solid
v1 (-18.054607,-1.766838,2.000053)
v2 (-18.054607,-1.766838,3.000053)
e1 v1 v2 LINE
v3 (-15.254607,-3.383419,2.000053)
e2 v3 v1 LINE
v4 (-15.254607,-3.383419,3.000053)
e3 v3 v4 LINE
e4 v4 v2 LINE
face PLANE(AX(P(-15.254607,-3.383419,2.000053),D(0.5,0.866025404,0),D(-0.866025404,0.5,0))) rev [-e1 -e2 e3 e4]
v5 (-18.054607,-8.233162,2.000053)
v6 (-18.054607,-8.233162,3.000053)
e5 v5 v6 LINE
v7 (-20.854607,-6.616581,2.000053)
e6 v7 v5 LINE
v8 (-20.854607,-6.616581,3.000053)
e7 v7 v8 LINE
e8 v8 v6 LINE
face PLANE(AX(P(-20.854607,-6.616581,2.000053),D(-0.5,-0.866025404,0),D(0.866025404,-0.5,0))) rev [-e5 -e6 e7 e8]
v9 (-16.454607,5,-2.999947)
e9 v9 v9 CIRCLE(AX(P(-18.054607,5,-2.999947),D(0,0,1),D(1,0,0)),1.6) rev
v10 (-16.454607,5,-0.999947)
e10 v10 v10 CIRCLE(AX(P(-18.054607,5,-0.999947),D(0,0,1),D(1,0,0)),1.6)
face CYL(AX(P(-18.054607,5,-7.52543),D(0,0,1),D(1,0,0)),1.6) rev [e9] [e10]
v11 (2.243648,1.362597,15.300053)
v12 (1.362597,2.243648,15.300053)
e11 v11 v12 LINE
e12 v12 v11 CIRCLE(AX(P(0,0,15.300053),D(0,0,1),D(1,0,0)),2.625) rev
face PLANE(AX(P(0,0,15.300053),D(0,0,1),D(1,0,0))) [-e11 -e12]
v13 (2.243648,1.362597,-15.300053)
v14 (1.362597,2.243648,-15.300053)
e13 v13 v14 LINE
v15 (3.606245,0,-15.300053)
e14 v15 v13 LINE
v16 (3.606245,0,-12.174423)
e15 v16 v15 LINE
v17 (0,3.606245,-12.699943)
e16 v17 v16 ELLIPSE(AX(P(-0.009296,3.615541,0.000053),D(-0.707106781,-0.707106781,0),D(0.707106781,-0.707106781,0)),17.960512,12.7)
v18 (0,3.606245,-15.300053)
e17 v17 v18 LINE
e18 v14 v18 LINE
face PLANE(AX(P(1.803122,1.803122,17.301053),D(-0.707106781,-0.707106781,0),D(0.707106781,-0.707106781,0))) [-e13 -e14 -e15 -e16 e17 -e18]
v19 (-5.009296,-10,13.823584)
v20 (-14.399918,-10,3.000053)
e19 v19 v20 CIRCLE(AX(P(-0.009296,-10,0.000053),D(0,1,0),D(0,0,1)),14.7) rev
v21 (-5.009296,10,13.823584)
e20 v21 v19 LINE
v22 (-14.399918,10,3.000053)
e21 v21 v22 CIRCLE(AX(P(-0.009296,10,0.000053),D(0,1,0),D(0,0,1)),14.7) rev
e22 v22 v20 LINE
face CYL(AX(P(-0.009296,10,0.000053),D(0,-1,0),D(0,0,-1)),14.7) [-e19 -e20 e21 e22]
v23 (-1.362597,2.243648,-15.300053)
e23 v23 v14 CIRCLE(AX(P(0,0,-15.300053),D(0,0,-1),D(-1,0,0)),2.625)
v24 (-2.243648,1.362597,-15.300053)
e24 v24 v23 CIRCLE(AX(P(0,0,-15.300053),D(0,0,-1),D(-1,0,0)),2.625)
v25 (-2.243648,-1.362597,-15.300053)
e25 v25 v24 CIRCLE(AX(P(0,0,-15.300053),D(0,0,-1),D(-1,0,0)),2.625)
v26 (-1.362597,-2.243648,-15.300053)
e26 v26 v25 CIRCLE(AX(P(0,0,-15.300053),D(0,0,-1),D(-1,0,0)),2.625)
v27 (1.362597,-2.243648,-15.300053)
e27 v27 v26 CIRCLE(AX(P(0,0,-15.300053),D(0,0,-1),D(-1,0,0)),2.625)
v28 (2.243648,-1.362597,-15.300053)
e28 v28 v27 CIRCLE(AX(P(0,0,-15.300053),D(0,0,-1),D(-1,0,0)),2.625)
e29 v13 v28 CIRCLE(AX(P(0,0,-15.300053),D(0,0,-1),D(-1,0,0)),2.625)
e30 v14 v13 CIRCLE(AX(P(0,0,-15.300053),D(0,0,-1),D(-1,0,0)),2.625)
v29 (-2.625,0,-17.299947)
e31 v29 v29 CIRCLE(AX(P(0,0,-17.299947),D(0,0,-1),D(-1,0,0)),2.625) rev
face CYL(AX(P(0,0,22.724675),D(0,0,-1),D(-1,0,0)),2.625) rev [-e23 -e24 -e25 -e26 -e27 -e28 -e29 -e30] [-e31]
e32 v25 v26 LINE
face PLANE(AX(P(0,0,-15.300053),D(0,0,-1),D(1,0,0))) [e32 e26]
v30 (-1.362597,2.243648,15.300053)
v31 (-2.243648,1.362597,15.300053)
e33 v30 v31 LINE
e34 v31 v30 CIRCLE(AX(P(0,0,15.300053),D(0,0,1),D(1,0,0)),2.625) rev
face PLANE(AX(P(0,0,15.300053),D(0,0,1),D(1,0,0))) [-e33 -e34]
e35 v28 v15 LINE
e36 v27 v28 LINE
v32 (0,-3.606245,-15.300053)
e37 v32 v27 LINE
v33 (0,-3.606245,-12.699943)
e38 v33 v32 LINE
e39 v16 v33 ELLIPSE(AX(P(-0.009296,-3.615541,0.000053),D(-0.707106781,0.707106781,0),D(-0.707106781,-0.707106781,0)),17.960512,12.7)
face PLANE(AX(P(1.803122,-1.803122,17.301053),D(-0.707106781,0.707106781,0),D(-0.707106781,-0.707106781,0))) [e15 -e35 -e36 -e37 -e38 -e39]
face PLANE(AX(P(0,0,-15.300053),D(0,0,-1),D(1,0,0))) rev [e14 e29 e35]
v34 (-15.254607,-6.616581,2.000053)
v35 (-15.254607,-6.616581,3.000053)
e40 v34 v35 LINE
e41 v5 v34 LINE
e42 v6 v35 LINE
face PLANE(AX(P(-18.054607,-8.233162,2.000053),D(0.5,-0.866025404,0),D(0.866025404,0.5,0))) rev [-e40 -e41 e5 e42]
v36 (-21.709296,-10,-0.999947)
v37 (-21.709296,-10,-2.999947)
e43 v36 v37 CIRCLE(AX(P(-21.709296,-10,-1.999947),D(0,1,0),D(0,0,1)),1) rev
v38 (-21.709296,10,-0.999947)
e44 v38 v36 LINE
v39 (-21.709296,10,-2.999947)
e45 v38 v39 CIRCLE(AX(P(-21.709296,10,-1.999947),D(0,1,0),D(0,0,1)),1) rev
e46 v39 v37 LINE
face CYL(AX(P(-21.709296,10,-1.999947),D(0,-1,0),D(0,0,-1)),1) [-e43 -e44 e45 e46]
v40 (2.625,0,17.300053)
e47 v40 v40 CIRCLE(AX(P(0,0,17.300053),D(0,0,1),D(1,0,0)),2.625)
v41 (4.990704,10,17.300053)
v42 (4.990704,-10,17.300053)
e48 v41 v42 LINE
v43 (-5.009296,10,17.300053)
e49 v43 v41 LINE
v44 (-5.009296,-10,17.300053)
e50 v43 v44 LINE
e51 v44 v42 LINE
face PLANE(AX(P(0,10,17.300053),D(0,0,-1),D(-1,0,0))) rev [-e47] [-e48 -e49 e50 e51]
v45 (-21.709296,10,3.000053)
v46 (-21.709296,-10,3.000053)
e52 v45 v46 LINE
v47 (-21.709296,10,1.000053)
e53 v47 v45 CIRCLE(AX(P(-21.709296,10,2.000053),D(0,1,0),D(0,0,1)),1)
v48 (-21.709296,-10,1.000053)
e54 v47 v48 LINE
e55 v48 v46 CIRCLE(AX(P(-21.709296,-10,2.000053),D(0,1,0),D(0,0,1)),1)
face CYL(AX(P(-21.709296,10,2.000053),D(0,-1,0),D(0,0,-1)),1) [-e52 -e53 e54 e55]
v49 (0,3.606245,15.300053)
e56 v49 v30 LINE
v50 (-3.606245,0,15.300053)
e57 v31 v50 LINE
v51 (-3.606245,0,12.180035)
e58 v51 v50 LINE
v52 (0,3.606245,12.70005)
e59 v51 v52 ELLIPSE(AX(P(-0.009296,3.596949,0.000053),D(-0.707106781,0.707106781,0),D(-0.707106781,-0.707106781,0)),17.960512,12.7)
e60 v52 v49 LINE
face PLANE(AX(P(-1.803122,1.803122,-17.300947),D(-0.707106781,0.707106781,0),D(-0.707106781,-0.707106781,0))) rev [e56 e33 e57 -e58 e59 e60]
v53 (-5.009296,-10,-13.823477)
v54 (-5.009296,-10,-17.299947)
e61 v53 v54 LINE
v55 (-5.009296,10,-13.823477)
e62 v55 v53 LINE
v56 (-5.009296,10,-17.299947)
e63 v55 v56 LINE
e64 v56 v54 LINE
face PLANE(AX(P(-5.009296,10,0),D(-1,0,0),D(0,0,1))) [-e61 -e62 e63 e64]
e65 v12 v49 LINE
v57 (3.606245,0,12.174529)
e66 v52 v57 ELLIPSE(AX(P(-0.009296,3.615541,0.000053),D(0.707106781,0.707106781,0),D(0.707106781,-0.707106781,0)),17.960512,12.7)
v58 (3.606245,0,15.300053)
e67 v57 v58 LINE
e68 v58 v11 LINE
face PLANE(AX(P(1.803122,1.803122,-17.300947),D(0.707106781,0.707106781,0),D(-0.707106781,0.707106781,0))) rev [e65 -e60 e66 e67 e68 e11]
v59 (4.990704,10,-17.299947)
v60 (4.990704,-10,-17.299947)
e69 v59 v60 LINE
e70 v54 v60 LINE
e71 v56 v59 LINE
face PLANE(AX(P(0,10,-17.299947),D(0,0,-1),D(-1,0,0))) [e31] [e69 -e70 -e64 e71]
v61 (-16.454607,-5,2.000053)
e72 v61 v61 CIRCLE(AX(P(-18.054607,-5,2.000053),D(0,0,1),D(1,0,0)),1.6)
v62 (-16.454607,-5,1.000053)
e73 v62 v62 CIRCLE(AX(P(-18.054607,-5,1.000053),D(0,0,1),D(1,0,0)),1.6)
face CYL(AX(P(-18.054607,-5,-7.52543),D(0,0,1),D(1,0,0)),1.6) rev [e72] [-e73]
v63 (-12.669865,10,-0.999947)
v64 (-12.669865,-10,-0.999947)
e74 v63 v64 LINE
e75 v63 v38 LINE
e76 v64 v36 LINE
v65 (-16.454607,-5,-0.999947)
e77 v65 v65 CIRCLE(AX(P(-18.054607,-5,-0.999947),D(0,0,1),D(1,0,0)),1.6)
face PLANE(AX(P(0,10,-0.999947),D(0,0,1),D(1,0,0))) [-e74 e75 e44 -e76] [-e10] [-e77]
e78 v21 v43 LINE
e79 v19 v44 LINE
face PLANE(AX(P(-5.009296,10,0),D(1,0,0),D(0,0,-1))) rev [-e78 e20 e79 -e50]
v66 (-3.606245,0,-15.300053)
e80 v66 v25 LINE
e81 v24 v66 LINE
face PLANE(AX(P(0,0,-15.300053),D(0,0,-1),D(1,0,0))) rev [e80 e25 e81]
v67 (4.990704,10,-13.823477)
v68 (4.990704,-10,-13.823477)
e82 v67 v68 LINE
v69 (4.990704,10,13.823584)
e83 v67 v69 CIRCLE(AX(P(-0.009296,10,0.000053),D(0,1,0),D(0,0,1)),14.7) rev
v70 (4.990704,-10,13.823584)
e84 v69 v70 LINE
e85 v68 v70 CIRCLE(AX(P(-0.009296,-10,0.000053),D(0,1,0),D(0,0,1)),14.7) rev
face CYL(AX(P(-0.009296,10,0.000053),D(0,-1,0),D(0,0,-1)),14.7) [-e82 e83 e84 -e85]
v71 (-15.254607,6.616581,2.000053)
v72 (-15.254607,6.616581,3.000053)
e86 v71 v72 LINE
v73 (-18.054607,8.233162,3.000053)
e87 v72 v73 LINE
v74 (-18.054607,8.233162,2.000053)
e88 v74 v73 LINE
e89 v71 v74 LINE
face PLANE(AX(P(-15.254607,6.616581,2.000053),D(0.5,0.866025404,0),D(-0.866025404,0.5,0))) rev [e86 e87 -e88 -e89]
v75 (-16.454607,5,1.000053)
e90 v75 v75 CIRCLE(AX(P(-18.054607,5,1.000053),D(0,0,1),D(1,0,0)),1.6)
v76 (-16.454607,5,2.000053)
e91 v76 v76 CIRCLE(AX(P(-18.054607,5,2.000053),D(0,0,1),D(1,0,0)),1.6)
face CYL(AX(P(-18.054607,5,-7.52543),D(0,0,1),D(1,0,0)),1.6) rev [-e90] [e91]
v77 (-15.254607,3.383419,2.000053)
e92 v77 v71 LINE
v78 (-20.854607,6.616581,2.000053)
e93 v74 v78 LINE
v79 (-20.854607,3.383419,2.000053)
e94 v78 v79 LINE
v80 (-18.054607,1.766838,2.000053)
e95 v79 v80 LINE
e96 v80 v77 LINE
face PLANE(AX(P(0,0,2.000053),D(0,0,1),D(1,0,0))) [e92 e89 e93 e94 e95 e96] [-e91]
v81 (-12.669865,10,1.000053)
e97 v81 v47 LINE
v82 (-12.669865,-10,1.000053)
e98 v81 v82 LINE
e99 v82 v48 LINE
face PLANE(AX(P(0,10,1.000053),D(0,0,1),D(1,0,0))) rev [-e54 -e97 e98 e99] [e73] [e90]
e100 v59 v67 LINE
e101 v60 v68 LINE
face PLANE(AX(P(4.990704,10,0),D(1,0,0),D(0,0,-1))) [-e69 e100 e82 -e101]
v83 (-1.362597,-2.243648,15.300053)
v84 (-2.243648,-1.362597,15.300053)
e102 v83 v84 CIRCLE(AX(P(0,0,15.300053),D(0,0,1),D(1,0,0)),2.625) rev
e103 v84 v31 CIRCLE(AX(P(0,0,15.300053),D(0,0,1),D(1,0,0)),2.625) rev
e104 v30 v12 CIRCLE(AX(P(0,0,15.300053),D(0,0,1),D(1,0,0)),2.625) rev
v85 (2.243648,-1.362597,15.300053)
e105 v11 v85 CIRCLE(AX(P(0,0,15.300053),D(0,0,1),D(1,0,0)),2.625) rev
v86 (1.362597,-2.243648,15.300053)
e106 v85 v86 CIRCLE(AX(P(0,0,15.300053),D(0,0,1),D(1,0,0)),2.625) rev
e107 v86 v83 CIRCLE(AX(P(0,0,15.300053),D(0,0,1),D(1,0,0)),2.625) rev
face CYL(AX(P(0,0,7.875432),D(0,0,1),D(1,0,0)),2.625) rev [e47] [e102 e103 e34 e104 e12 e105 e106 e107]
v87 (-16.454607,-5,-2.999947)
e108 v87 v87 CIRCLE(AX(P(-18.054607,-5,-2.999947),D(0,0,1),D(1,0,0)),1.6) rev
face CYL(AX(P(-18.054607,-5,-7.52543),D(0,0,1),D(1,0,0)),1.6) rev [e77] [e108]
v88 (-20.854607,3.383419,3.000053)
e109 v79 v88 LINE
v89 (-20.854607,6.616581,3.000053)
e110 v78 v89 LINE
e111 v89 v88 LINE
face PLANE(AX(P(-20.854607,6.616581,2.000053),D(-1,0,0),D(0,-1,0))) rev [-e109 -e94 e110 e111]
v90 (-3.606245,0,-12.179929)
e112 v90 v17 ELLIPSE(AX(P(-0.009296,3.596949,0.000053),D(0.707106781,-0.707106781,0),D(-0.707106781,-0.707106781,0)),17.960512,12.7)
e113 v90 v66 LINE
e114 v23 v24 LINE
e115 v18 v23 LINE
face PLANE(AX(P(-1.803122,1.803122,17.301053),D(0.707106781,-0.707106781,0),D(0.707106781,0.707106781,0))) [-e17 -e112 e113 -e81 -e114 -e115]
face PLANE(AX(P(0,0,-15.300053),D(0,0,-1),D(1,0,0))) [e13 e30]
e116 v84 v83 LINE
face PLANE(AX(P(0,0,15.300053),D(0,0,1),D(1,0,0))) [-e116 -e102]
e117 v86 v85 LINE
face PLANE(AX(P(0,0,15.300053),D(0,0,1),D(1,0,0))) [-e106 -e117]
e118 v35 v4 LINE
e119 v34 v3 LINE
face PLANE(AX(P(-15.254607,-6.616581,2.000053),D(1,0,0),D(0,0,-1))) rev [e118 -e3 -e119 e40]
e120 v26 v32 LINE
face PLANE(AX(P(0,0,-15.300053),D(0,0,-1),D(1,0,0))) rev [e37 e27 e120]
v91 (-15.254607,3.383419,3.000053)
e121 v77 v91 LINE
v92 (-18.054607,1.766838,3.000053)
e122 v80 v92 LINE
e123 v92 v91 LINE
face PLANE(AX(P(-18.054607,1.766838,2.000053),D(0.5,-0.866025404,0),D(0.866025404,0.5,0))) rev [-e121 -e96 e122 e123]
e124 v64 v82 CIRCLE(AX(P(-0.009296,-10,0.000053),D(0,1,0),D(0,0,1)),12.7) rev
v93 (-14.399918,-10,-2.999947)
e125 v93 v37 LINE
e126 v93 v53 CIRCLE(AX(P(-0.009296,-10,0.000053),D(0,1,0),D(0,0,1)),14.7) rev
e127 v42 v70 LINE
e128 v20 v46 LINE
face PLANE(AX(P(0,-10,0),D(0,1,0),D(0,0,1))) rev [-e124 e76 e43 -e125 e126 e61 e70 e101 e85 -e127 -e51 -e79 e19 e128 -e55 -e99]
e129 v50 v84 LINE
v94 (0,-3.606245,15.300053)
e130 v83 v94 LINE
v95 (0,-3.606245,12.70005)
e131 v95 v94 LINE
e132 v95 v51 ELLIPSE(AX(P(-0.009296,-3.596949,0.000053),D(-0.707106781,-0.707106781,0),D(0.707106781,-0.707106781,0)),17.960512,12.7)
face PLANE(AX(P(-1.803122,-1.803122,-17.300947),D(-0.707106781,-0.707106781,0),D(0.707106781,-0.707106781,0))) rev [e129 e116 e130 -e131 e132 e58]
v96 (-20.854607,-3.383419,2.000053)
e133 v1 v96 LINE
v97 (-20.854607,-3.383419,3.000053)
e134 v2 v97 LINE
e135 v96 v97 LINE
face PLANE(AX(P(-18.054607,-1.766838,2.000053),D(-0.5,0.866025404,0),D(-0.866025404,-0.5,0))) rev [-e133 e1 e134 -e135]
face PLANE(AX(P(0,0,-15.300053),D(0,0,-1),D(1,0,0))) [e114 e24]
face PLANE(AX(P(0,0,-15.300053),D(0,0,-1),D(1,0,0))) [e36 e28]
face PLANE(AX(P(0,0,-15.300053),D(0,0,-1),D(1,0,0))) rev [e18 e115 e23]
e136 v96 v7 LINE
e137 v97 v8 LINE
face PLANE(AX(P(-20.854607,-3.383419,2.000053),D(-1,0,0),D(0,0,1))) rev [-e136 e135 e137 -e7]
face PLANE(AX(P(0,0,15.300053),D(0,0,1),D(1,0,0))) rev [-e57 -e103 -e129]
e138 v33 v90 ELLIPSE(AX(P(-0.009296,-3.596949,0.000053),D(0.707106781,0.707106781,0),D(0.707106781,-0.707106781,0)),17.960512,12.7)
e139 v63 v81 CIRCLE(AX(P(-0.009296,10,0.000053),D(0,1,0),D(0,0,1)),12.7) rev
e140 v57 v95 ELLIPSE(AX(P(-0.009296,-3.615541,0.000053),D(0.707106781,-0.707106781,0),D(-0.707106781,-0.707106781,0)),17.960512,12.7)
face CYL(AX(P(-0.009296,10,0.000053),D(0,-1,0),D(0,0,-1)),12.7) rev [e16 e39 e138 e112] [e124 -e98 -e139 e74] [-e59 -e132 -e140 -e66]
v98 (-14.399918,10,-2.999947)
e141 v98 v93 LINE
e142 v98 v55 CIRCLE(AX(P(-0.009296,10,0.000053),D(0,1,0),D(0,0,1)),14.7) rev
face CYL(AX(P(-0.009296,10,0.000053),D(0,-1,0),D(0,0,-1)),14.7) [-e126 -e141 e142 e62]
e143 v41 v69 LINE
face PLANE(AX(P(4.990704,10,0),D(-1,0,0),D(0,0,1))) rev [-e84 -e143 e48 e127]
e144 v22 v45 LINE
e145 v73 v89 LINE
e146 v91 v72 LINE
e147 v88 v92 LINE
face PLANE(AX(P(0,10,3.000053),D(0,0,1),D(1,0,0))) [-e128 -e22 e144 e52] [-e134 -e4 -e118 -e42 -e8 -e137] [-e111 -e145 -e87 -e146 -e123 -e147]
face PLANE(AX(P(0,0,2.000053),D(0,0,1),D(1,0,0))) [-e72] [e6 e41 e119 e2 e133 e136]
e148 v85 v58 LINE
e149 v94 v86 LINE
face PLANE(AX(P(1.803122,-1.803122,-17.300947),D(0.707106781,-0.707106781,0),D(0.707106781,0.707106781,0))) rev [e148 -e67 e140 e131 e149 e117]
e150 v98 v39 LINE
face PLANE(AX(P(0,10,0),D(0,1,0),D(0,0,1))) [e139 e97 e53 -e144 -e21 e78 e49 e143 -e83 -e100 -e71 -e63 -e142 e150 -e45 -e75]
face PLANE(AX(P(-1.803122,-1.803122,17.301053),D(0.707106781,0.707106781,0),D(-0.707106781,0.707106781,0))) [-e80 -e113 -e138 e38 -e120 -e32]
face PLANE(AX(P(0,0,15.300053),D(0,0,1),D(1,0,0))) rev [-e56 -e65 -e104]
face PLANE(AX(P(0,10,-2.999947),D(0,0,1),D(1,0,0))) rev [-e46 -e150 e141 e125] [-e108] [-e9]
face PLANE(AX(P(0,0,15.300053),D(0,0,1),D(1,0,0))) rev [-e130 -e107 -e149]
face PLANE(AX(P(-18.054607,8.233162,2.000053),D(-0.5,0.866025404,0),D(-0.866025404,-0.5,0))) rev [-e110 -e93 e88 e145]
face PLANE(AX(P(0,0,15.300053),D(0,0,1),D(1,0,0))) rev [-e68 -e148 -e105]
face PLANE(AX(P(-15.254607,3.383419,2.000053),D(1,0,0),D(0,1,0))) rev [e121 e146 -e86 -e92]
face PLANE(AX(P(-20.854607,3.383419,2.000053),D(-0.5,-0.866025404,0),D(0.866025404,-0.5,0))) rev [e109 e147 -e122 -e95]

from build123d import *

# Parameters (mm, degrees)
BOSS_EXTRUDE1_DEPTH      = 10
CUT_EXTRUDE10_REACH      = 46.578
CUT_EXTRUDE10_END_RADIUS = 12.7
CUT_EXTRUDE10_START      = -2
SKETCH8_R                = 2.625
CUT_EXTRUDE11_DEPTH      = 2
CUT_EXTRUDE12_DEPTH      = 1
CUT_EXTRUDE13_REACH      = 33.436
SKETCH10_R               = 1.6


# Read off the part's stored shape, not the designer's step: Mirror2
with BuildPart() as part:
    # Sketch1 → Boss-Extrude1 (new, symmetric)
    with BuildSketch(Plane(origin=(0, 0, 0), x_dir=(1, 0, 0), z_dir=(0, 1, 0))):
        with BuildLine():
            Line((-12.709296078, -1.000053339), (-21.709296078, -1.000053339))
            ThreePointArc((-21.709296078, -1.000053339), (-22.709296078, -2.000053339), (-21.709296078, -3.000053339))
            Line((-21.709296078, -3.000053339), (-14.399918025, -3.000053339))
            ThreePointArc((-14.399918025, -3.000053339), (14.690703922, -5.3339e-05), (-14.399918025, 2.999946661))
            Line((-14.399918025, 2.999946661), (-21.709296078, 2.999946661))
            ThreePointArc((-21.709296078, 2.999946661), (-22.709296078, 1.999946661), (-21.709296078, 0.999946661))
            Line((-21.709296078, 0.999946661), (-12.709296078, 0.999946661))
            Line((-12.709296078, 0.999946661), (-12.669864786, 0.999946661))
            ThreePointArc((-12.669864786, 0.999946661), (12.690703922, -5.3339e-05), (-12.669864786, -1.000053339))
            Line((-12.669864786, -1.000053339), (-12.709296078, -1.000053339))
        make_face()
        with BuildLine():
            ThreePointArc((4.990703922, -13.823584002), (-0.009296078, -14.700053339), (-5.009296078, -13.823584002))
            Line((-5.009296078, -13.823584002), (-5.009296078, -14.750053339))
            Line((-5.009296078, -14.750053339), (-5.009296078, -17.300053339))
            Line((-5.009296078, -17.300053339), (4.990703922, -17.300053339))
            Line((4.990703922, -17.300053339), (4.990703922, -14.750053339))
            Line((4.990703922, -14.750053339), (4.990703922, -13.823584002))
        make_face()
        with BuildLine():
            Line((-5.009296078, 14.749946661), (-5.009296078, 13.823477324))
            ThreePointArc((-5.009296078, 13.823477324), (-0.009296078, 14.699946661), (4.990703922, 13.823477324))
            Line((4.990703922, 13.823477324), (4.990703922, 14.749946661))
            Line((4.990703922, 14.749946661), (4.990703922, 17.299946661))
            Line((4.990703922, 17.299946661), (-5.009296078, 17.299946661))
            Line((-5.009296078, 17.299946661), (-5.009296078, 14.749946661))
        make_face()
    extrude(amount=BOSS_EXTRUDE1_DEPTH, both=True)

    # Cut-Extrude10: up to this cylinder (the profile starts outside it)
    cut_extrude10_end = Plane(origin=(-0.009296078, 0, 5.3339e-05), z_dir=(0, -1, 0)) * Cylinder(CUT_EXTRUDE10_END_RADIUS, 119.556, mode=Mode.PRIVATE)
    # Sketch7 → Cut-Extrude10 (cut, up to the surface)
    with BuildSketch(Plane.XY.offset(17.300053339).offset(CUT_EXTRUDE10_START), mode=Mode.PRIVATE) as cut_extrude10_sk1:
        Polygon((0, 3.606244584), (-3.606244584, 0), (0, -3.606244584), (3.606244584, 0), align=None)
    cut_extrude10_tool1 = extrude(cut_extrude10_sk1.sketch, amount=-CUT_EXTRUDE10_REACH, mode=Mode.PRIVATE) - cut_extrude10_end
    add(cut_extrude10_tool1.solids().sort_by_distance((0, 0, 15.300053))[0], mode=Mode.SUBTRACT)

    # Sketch8 → Cut-Extrude11 (cut)
    with BuildSketch(Plane.XY.offset(17.300053339)):
        Circle(SKETCH8_R)
    extrude(amount=-CUT_EXTRUDE11_DEPTH, mode=Mode.SUBTRACT)

    # Mirror2
    split(bisect_by=Plane.XY, keep=Keep.TOP)

    # Mirror2 2: part across plane


with BuildPart() as part_1:
    add(part.part)
    add(part.part.mirror(Plane.XY))

    # Sketch9 → Cut-Extrude12 (cut)
    with BuildSketch(Plane.XY.offset(3.000053339)):
        Polygon((-18.054607052, 8.233161507), (-20.854607052, 6.616580754), (-20.854607052, 3.383419246), (-18.054607052, 1.766838493), (-15.254607052, 3.383419246), (-15.254607052, 6.616580754), align=None)
        Polygon((-18.054607052, -1.766838493), (-20.854607052, -3.383419246), (-20.854607052, -6.616580754), (-18.054607052, -8.233161507), (-15.254607052, -6.616580754), (-15.254607052, -3.383419246), align=None)
    extrude(amount=-CUT_EXTRUDE12_DEPTH, mode=Mode.SUBTRACT)

    # Cut-Extrude13: up to this face of the body (flat: up to its plane)
    cut_extrude13_end = Plane(part_1.part.faces().sort_by_distance((-18.054607052, 0, -3.000053339))[0])
    # Sketch10 → Cut-Extrude13 (cut, up to the picked face)
    with BuildSketch(Plane.XY.offset(2.000053339), mode=Mode.PRIVATE) as cut_extrude13_sk1:
        with Locations((-18.054607052, 5)):
            Circle(SKETCH10_R)
    cut_extrude13_tool1 = split(extrude(cut_extrude13_sk1.sketch, amount=-CUT_EXTRUDE13_REACH, mode=Mode.PRIVATE), bisect_by=cut_extrude13_end, keep=Keep.BOTH, mode=Mode.PRIVATE)
    # Sketch10 → Cut-Extrude13 (cut, up to the picked face)
    with BuildSketch(Plane.XY.offset(2.000053339), mode=Mode.PRIVATE) as cut_extrude13_sk2:
        with Locations((-18.054607052, -5)):
            Circle(SKETCH10_R)
    cut_extrude13_tool2 = split(extrude(cut_extrude13_sk2.sketch, amount=-CUT_EXTRUDE13_REACH, mode=Mode.PRIVATE), bisect_by=cut_extrude13_end, keep=Keep.BOTH, mode=Mode.PRIVATE)
    add(cut_extrude13_tool1.solids().sort_by(Axis((-18.054607, 5, 2.000053), (0, 0, -1)))[0], mode=Mode.SUBTRACT)
    add(cut_extrude13_tool2.solids().sort_by(Axis((-18.054607, -5, 2.000053), (0, 0, -1)))[0], mode=Mode.SUBTRACT)


solid = part_1.part
